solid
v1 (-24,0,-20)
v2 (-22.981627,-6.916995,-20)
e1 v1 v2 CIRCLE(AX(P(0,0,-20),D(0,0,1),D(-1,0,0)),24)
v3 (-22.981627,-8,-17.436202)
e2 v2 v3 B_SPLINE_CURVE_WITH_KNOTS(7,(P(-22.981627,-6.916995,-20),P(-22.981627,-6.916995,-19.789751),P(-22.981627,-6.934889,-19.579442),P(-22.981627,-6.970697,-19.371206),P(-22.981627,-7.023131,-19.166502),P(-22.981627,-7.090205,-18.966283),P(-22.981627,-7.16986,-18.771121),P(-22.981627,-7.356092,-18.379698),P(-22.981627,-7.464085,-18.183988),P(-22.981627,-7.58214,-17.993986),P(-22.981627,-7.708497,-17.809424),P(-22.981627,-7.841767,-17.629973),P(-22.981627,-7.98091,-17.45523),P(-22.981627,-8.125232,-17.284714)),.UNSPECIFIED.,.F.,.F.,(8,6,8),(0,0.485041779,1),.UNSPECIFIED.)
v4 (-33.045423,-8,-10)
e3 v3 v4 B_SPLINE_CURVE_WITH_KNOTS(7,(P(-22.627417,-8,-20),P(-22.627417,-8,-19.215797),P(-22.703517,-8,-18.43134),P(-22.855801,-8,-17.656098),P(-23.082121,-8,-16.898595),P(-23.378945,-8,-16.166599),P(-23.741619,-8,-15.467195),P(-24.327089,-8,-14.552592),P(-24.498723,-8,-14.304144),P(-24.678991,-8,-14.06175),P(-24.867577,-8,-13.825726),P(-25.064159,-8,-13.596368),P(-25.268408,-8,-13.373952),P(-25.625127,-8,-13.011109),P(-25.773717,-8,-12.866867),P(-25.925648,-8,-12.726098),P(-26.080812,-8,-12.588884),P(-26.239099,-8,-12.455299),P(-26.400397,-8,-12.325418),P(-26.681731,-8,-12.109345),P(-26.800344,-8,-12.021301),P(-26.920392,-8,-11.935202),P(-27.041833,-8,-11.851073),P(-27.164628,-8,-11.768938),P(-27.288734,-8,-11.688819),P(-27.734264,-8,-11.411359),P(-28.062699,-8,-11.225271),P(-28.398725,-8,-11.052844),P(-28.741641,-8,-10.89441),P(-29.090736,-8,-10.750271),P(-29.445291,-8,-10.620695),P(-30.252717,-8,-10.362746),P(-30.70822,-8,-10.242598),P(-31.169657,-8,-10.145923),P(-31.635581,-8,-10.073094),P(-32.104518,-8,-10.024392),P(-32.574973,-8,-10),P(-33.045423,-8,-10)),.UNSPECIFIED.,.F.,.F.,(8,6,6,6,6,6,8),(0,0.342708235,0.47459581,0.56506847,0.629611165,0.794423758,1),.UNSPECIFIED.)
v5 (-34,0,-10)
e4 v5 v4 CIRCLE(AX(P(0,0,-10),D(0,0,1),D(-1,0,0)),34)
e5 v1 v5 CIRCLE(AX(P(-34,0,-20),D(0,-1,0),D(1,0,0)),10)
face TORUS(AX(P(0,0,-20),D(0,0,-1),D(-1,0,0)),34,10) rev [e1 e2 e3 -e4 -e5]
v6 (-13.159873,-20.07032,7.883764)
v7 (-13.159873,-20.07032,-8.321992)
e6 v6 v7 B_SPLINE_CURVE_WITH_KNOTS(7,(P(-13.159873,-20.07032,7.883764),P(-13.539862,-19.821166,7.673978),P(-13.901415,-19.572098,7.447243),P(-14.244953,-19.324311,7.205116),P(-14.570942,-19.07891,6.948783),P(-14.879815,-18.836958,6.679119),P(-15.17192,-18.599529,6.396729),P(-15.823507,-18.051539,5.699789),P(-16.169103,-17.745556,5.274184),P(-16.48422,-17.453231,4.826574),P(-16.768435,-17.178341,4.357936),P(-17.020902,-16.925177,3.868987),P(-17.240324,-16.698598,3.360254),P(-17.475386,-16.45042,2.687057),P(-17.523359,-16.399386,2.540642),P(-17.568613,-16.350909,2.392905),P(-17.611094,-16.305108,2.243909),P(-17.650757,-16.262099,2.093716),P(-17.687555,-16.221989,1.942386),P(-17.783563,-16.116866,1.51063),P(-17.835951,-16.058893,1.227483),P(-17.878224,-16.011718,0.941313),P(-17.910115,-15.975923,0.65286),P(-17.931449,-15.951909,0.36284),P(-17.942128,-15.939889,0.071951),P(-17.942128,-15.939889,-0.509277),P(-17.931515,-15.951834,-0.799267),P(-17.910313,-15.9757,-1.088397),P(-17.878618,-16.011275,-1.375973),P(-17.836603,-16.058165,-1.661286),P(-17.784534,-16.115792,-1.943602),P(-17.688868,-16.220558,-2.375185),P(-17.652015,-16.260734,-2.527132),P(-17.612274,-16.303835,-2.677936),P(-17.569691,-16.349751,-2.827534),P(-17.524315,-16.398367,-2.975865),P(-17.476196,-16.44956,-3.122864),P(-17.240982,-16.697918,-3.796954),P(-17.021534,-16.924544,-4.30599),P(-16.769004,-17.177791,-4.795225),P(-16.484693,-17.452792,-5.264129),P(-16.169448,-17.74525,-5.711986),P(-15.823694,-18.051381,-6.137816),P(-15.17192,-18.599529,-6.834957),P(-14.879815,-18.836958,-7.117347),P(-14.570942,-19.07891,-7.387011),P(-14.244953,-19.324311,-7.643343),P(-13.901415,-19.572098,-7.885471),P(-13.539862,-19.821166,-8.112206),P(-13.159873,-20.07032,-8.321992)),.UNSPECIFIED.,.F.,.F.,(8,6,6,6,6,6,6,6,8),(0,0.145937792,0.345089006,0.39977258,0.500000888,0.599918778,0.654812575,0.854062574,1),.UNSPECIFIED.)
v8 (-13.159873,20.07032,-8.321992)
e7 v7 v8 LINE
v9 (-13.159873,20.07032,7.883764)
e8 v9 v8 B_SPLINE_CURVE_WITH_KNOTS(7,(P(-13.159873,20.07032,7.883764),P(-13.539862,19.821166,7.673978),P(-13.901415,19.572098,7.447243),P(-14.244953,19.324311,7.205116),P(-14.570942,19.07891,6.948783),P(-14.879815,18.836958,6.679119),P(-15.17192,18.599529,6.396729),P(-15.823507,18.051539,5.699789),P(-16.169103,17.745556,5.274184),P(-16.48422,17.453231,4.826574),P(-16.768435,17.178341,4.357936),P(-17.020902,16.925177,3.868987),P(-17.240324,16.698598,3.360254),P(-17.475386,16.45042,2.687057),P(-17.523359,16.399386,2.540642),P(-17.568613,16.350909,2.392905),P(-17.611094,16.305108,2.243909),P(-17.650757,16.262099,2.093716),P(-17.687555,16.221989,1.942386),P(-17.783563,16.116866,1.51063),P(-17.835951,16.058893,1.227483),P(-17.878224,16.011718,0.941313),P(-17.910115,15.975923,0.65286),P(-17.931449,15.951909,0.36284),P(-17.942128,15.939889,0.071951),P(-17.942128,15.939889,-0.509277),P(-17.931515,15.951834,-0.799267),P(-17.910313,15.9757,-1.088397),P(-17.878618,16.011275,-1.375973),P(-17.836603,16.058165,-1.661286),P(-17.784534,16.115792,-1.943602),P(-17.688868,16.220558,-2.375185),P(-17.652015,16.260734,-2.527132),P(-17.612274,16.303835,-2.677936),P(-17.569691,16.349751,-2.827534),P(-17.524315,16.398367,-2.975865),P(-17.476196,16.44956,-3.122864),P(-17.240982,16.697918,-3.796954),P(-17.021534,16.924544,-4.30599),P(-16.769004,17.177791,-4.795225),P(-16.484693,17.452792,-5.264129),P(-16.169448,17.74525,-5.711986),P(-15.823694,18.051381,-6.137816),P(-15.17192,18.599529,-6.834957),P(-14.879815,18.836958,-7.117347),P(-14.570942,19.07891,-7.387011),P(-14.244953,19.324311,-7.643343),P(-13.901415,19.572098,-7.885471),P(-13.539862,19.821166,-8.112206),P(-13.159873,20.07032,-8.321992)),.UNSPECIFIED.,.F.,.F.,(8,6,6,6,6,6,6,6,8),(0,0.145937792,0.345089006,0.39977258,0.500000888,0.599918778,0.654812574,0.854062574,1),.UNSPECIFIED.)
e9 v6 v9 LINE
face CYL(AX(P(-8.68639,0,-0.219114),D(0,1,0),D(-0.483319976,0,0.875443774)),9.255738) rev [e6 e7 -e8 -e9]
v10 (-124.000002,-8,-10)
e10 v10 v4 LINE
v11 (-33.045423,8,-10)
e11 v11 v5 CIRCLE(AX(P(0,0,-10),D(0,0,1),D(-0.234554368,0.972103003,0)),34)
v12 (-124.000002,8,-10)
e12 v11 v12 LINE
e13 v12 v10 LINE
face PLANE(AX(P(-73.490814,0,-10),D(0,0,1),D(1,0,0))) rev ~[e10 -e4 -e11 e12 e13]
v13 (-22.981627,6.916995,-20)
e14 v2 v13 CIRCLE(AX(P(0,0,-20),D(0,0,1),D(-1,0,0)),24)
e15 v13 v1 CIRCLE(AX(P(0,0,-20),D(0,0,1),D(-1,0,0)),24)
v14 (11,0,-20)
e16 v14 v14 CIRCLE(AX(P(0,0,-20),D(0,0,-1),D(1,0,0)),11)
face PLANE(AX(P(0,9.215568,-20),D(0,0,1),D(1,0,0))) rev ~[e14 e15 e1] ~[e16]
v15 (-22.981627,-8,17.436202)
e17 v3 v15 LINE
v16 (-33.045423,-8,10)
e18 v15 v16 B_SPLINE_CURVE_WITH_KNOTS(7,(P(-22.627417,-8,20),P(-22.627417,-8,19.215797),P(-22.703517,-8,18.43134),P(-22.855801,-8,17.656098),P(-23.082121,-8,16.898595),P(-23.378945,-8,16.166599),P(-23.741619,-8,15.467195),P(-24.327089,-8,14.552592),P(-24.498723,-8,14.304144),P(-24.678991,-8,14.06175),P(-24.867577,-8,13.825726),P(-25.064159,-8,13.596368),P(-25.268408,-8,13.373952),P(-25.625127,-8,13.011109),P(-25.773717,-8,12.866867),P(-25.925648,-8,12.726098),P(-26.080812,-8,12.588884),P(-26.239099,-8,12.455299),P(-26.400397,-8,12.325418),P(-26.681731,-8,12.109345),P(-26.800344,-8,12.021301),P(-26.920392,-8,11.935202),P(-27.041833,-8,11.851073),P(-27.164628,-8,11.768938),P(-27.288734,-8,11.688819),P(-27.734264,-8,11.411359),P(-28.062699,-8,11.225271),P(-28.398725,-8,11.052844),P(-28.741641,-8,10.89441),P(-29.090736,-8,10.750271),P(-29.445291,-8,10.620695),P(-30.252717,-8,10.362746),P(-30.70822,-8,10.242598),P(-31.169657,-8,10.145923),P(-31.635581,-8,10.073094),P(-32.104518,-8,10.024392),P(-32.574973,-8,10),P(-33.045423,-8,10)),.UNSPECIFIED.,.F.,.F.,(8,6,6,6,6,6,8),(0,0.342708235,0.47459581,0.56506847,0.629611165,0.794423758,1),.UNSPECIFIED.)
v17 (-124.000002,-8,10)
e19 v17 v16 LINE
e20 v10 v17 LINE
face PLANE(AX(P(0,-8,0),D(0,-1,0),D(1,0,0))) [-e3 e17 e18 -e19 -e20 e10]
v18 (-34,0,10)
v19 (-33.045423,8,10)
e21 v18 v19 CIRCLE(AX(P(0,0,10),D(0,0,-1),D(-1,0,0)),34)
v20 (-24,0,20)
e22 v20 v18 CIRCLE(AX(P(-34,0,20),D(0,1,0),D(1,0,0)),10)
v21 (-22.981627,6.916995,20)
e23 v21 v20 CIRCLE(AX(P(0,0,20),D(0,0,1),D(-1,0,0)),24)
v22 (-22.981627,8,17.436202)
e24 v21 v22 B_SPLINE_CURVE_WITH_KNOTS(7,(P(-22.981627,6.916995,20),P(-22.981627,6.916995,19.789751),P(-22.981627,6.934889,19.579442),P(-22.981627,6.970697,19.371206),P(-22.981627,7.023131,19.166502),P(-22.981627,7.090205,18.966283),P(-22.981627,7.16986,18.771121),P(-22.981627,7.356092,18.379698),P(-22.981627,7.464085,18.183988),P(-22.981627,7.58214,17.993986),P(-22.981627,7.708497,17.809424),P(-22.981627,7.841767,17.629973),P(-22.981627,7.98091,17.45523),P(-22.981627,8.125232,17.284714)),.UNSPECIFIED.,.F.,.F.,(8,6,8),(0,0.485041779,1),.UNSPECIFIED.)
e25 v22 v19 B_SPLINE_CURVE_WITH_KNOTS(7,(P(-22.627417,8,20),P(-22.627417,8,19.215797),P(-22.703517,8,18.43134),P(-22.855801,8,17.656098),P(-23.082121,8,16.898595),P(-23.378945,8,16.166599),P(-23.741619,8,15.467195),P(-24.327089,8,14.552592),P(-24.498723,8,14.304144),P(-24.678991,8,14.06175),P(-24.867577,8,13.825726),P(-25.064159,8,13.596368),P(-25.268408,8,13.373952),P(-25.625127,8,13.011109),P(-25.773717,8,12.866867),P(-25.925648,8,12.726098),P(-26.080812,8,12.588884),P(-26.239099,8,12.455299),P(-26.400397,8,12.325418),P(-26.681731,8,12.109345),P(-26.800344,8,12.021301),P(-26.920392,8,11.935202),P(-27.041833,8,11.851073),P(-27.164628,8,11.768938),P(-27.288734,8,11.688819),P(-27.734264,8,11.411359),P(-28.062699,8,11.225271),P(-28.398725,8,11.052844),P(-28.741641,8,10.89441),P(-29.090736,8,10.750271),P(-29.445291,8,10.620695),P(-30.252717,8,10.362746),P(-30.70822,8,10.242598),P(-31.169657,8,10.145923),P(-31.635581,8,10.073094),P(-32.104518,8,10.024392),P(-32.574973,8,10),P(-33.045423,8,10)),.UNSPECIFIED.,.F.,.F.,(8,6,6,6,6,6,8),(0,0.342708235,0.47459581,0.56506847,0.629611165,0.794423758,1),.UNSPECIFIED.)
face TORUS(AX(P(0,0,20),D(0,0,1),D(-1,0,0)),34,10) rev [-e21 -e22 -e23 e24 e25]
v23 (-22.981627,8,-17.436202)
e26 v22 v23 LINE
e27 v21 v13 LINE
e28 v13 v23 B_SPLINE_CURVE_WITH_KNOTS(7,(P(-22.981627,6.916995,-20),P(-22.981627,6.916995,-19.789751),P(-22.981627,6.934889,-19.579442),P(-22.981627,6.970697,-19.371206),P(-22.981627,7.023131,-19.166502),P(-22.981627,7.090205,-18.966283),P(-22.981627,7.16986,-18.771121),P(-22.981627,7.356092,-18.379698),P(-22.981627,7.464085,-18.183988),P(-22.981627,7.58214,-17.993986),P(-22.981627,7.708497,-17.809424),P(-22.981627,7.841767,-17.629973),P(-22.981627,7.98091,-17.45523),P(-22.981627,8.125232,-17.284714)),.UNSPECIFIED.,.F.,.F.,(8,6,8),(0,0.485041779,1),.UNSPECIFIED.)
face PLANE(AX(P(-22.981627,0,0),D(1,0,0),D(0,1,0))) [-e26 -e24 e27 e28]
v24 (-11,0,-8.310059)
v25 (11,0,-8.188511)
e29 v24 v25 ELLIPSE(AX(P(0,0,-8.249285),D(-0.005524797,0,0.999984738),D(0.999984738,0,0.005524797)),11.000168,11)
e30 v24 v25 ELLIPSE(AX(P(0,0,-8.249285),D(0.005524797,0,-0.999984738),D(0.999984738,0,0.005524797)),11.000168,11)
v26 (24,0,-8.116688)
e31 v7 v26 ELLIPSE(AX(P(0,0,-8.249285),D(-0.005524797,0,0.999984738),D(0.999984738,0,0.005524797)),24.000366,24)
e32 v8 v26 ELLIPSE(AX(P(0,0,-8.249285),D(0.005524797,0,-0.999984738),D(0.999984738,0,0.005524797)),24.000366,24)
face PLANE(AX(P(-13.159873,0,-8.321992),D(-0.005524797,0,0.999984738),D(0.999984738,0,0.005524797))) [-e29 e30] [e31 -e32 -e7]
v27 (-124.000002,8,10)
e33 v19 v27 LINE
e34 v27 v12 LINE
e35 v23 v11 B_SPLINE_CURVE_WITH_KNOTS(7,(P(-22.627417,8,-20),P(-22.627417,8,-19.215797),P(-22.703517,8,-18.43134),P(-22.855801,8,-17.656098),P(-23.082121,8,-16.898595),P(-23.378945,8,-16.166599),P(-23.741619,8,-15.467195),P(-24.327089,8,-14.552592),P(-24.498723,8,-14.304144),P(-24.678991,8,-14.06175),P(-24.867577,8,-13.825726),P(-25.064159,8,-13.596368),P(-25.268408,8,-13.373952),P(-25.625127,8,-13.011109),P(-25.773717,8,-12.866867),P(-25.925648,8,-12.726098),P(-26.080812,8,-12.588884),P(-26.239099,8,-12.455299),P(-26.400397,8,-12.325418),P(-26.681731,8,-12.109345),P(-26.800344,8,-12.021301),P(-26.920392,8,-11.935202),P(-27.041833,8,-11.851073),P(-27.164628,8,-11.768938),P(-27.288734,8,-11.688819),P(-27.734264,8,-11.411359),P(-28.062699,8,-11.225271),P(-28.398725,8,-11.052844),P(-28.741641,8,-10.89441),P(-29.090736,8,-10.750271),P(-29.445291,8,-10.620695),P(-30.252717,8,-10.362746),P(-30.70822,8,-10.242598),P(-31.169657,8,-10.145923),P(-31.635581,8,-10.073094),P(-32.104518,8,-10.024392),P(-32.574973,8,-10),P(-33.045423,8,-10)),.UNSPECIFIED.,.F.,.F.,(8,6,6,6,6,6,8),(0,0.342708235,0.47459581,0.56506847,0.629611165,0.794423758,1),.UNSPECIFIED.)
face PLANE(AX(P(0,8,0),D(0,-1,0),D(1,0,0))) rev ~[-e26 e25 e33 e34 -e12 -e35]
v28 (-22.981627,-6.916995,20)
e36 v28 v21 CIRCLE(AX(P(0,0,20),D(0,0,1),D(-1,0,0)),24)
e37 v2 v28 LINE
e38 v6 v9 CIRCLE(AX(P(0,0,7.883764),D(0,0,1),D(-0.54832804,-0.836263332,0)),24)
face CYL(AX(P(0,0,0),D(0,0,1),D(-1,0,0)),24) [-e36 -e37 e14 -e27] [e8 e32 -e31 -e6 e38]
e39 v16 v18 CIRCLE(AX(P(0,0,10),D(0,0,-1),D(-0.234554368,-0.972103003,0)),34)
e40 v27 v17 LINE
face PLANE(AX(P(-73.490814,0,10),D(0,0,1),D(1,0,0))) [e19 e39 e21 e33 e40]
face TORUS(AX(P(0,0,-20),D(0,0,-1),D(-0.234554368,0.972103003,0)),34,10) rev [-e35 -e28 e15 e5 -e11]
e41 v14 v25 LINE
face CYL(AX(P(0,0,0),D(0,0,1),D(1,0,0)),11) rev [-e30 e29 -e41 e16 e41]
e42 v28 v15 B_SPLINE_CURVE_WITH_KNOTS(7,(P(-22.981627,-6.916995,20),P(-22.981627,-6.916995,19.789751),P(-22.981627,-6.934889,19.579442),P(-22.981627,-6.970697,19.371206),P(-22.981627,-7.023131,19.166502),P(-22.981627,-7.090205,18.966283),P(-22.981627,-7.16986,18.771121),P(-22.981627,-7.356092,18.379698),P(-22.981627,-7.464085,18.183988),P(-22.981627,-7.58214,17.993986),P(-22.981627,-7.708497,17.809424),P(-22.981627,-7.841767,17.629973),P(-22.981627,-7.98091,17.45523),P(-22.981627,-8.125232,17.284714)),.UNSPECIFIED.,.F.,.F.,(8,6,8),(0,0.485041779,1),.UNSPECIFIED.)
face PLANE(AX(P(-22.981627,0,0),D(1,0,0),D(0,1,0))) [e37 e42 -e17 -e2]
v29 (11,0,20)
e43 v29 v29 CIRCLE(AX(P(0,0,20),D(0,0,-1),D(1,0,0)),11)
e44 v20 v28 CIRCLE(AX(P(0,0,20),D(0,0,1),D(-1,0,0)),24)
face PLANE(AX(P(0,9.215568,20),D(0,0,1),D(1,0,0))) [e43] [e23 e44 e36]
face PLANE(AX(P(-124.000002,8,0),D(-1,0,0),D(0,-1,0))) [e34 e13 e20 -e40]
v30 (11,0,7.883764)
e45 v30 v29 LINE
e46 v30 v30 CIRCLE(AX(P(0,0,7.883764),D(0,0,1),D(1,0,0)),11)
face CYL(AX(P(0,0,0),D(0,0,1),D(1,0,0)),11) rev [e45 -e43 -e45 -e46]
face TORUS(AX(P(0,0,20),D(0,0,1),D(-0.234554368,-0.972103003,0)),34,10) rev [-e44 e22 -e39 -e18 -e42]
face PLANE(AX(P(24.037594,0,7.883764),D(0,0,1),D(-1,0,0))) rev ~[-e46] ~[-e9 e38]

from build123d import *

# Parameters (mm, degrees)
F1_DEPTH      = 20
F1_DEPTH_BACK = 20
F3_DEPTH      = 10
F3_DEPTH_BACK = 10
F5_DEPTH      = 25
F5_DEPTH_BACK = 25
F6_T4_ANGLE   = 76.4346442218
F6_T10_ANGLE  = 76.4346442218
F6_T16_ANGLE  = 76.4346442218
F6_T22_ANGLE  = 76.4346442218


# Not quite as in the source:
# - a fillet or chamfer that OpenCascade refuses, or shapes differently, is made with other operations: its cross-section is extruded or revolved along the edge and cut away or added
# - two fillets or chamfers of one size are made in one step


with BuildPart() as f1:
    # F0 (on Top) → F1 (new body, two sides)
    with BuildSketch(Plane.XY) as f1_sk:
        with BuildLine():
            Line((11, 0), (24, 0))
            ThreePointArc((24, 0), (0, 24), (-24, 0))
            Line((-24, 0), (-11, 0))
            ThreePointArc((-11, 0), (0, 11), (11, 0))
        make_face()
        with BuildLine():
            ThreePointArc((-24, 0), (0, -24), (24, 0))
            Line((24, 0), (11, 0))
            ThreePointArc((11, 0), (0, -11), (-11, 0))
            Line((-11, 0), (-24, 0))
        make_face()
    extrude(amount=F1_DEPTH)
    extrude(f1_sk.sketch, amount=-F1_DEPTH_BACK)

    # F2 (on Top) → F3 (join, two sides)
    with BuildSketch(Plane.XY) as f3_sk:
        Polygon((-124.000001856, 8), (-124.000001856, 0), (-124.000001856, -8), (-22.981626913, -8), (-22.981626913, 8), align=None)
    extrude(amount=F3_DEPTH)
    extrude(f3_sk.sketch, amount=-F3_DEPTH_BACK)

    # F4 (on Front) → F5 (cut, two sides)
    with BuildSketch(Plane.XZ) as f5_sk:
        with BuildLine():
            Line((-13.159872964, -8.3219918372), (24.1259910374, -8.1159918464))
            Line((24.1259910374, -8.1159918464), (24.037594278, 7.8837639647))
            Line((24.037594278, 7.8837639647), (-13.159872964, 7.8837639647))
            ThreePointArc((-13.159872964, 7.8837639647), (-17.9421277203, -0.2191139363), (-13.159872964, -8.3219918372))
        make_face()
    extrude(amount=-F5_DEPTH, mode=Mode.SUBTRACT)
    extrude(f5_sk.sketch, amount=F5_DEPTH_BACK, mode=Mode.SUBTRACT)

    # F6: fillet of radius 10 on 4 edges, made by hand


with BuildPart() as f6_tool2:
    # F6_s3 → F6_t4 (revolve)
    with BuildSketch(Plane(origin=(0, 0, 0), x_dir=(0, 0, 1), z_dir=(0.9721030029, -0.2345543684, 0))):
        with BuildLine():
            ThreePointArc((20, 24), (12.9289321881, 26.9289321881), (10, 34))
            Line((10, 34), (10, 24))
            Line((10, 24), (20, 24))
        make_face()
    revolve(axis=Axis((0, 0, 10), (0, 0, -1)), revolution_arc=F6_T4_ANGLE)

    split(bisect_by=Plane.XZ.offset(8), keep=Keep.BOTTOM)

    split(bisect_by=Plane.YZ.offset(-22.981626913), keep=Keep.BOTTOM)


with BuildPart() as f1_1:
    add(f1.part)

    # F6_t1: union F6_tool2
    add(f6_tool2.part)


with BuildPart() as f6_tool8:
    # F6_s9 → F6_t10 (revolve)
    with BuildSketch(Plane.XZ):
        with BuildLine():
            ThreePointArc((-24, 20), (-26.9289321881, 12.9289321881), (-34, 10))
            Line((-34, 10), (-24, 10))
            Line((-24, 10), (-24, 20))
        make_face()
    revolve(axis=Axis((0, 0, 10), (0, 0, -1)), revolution_arc=F6_T10_ANGLE)

    split(bisect_by=Plane.XZ.offset(-8), keep=Keep.TOP)

    split(bisect_by=Plane.YZ.offset(-22.981626913), keep=Keep.BOTTOM)


with BuildPart() as f1_2:
    add(f1_1.part)

    # F6_t7: union F6_tool8
    add(f6_tool8.part)


with BuildPart() as f6_tool14:
    # F6_s15 → F6_t16 (revolve)
    with BuildSketch(Plane(origin=(0, 0, 0), x_dir=(0, 0, 1), z_dir=(0.9721030029, 0.2345543684, 0))):
        with BuildLine():
            ThreePointArc((-20, -24), (-12.9289321881, -26.9289321881), (-10, -34))
            Line((-10, -34), (-10, -24))
            Line((-10, -24), (-20, -24))
        make_face()
    revolve(axis=Axis((0, 0, -10), (0, 0, 1)), revolution_arc=F6_T16_ANGLE)

    split(bisect_by=Plane.XZ.offset(-8), keep=Keep.TOP)

    split(bisect_by=Plane.YZ.offset(-22.981626913), keep=Keep.BOTTOM)


with BuildPart() as f1_3:
    add(f1_2.part)

    # F6_t13: union F6_tool14
    add(f6_tool14.part)


with BuildPart() as f6_tool20:
    # F6_s21 → F6_t22 (revolve)
    with BuildSketch(Plane.XZ):
        with BuildLine():
            ThreePointArc((-24, -20), (-26.9289321881, -12.9289321881), (-34, -10))
            Line((-34, -10), (-24, -10))
            Line((-24, -10), (-24, -20))
        make_face()
    revolve(axis=Axis((0, 0, -10), (0, 0, 1)), revolution_arc=F6_T22_ANGLE)

    split(bisect_by=Plane.XZ.offset(8), keep=Keep.BOTTOM)

    split(bisect_by=Plane.YZ.offset(-22.981626913), keep=Keep.BOTTOM)


with BuildPart() as f1_4:
    add(f1_3.part)

    # F6_t19: union F6_tool20
    add(f6_tool20.part)


solid = f1_4.part
